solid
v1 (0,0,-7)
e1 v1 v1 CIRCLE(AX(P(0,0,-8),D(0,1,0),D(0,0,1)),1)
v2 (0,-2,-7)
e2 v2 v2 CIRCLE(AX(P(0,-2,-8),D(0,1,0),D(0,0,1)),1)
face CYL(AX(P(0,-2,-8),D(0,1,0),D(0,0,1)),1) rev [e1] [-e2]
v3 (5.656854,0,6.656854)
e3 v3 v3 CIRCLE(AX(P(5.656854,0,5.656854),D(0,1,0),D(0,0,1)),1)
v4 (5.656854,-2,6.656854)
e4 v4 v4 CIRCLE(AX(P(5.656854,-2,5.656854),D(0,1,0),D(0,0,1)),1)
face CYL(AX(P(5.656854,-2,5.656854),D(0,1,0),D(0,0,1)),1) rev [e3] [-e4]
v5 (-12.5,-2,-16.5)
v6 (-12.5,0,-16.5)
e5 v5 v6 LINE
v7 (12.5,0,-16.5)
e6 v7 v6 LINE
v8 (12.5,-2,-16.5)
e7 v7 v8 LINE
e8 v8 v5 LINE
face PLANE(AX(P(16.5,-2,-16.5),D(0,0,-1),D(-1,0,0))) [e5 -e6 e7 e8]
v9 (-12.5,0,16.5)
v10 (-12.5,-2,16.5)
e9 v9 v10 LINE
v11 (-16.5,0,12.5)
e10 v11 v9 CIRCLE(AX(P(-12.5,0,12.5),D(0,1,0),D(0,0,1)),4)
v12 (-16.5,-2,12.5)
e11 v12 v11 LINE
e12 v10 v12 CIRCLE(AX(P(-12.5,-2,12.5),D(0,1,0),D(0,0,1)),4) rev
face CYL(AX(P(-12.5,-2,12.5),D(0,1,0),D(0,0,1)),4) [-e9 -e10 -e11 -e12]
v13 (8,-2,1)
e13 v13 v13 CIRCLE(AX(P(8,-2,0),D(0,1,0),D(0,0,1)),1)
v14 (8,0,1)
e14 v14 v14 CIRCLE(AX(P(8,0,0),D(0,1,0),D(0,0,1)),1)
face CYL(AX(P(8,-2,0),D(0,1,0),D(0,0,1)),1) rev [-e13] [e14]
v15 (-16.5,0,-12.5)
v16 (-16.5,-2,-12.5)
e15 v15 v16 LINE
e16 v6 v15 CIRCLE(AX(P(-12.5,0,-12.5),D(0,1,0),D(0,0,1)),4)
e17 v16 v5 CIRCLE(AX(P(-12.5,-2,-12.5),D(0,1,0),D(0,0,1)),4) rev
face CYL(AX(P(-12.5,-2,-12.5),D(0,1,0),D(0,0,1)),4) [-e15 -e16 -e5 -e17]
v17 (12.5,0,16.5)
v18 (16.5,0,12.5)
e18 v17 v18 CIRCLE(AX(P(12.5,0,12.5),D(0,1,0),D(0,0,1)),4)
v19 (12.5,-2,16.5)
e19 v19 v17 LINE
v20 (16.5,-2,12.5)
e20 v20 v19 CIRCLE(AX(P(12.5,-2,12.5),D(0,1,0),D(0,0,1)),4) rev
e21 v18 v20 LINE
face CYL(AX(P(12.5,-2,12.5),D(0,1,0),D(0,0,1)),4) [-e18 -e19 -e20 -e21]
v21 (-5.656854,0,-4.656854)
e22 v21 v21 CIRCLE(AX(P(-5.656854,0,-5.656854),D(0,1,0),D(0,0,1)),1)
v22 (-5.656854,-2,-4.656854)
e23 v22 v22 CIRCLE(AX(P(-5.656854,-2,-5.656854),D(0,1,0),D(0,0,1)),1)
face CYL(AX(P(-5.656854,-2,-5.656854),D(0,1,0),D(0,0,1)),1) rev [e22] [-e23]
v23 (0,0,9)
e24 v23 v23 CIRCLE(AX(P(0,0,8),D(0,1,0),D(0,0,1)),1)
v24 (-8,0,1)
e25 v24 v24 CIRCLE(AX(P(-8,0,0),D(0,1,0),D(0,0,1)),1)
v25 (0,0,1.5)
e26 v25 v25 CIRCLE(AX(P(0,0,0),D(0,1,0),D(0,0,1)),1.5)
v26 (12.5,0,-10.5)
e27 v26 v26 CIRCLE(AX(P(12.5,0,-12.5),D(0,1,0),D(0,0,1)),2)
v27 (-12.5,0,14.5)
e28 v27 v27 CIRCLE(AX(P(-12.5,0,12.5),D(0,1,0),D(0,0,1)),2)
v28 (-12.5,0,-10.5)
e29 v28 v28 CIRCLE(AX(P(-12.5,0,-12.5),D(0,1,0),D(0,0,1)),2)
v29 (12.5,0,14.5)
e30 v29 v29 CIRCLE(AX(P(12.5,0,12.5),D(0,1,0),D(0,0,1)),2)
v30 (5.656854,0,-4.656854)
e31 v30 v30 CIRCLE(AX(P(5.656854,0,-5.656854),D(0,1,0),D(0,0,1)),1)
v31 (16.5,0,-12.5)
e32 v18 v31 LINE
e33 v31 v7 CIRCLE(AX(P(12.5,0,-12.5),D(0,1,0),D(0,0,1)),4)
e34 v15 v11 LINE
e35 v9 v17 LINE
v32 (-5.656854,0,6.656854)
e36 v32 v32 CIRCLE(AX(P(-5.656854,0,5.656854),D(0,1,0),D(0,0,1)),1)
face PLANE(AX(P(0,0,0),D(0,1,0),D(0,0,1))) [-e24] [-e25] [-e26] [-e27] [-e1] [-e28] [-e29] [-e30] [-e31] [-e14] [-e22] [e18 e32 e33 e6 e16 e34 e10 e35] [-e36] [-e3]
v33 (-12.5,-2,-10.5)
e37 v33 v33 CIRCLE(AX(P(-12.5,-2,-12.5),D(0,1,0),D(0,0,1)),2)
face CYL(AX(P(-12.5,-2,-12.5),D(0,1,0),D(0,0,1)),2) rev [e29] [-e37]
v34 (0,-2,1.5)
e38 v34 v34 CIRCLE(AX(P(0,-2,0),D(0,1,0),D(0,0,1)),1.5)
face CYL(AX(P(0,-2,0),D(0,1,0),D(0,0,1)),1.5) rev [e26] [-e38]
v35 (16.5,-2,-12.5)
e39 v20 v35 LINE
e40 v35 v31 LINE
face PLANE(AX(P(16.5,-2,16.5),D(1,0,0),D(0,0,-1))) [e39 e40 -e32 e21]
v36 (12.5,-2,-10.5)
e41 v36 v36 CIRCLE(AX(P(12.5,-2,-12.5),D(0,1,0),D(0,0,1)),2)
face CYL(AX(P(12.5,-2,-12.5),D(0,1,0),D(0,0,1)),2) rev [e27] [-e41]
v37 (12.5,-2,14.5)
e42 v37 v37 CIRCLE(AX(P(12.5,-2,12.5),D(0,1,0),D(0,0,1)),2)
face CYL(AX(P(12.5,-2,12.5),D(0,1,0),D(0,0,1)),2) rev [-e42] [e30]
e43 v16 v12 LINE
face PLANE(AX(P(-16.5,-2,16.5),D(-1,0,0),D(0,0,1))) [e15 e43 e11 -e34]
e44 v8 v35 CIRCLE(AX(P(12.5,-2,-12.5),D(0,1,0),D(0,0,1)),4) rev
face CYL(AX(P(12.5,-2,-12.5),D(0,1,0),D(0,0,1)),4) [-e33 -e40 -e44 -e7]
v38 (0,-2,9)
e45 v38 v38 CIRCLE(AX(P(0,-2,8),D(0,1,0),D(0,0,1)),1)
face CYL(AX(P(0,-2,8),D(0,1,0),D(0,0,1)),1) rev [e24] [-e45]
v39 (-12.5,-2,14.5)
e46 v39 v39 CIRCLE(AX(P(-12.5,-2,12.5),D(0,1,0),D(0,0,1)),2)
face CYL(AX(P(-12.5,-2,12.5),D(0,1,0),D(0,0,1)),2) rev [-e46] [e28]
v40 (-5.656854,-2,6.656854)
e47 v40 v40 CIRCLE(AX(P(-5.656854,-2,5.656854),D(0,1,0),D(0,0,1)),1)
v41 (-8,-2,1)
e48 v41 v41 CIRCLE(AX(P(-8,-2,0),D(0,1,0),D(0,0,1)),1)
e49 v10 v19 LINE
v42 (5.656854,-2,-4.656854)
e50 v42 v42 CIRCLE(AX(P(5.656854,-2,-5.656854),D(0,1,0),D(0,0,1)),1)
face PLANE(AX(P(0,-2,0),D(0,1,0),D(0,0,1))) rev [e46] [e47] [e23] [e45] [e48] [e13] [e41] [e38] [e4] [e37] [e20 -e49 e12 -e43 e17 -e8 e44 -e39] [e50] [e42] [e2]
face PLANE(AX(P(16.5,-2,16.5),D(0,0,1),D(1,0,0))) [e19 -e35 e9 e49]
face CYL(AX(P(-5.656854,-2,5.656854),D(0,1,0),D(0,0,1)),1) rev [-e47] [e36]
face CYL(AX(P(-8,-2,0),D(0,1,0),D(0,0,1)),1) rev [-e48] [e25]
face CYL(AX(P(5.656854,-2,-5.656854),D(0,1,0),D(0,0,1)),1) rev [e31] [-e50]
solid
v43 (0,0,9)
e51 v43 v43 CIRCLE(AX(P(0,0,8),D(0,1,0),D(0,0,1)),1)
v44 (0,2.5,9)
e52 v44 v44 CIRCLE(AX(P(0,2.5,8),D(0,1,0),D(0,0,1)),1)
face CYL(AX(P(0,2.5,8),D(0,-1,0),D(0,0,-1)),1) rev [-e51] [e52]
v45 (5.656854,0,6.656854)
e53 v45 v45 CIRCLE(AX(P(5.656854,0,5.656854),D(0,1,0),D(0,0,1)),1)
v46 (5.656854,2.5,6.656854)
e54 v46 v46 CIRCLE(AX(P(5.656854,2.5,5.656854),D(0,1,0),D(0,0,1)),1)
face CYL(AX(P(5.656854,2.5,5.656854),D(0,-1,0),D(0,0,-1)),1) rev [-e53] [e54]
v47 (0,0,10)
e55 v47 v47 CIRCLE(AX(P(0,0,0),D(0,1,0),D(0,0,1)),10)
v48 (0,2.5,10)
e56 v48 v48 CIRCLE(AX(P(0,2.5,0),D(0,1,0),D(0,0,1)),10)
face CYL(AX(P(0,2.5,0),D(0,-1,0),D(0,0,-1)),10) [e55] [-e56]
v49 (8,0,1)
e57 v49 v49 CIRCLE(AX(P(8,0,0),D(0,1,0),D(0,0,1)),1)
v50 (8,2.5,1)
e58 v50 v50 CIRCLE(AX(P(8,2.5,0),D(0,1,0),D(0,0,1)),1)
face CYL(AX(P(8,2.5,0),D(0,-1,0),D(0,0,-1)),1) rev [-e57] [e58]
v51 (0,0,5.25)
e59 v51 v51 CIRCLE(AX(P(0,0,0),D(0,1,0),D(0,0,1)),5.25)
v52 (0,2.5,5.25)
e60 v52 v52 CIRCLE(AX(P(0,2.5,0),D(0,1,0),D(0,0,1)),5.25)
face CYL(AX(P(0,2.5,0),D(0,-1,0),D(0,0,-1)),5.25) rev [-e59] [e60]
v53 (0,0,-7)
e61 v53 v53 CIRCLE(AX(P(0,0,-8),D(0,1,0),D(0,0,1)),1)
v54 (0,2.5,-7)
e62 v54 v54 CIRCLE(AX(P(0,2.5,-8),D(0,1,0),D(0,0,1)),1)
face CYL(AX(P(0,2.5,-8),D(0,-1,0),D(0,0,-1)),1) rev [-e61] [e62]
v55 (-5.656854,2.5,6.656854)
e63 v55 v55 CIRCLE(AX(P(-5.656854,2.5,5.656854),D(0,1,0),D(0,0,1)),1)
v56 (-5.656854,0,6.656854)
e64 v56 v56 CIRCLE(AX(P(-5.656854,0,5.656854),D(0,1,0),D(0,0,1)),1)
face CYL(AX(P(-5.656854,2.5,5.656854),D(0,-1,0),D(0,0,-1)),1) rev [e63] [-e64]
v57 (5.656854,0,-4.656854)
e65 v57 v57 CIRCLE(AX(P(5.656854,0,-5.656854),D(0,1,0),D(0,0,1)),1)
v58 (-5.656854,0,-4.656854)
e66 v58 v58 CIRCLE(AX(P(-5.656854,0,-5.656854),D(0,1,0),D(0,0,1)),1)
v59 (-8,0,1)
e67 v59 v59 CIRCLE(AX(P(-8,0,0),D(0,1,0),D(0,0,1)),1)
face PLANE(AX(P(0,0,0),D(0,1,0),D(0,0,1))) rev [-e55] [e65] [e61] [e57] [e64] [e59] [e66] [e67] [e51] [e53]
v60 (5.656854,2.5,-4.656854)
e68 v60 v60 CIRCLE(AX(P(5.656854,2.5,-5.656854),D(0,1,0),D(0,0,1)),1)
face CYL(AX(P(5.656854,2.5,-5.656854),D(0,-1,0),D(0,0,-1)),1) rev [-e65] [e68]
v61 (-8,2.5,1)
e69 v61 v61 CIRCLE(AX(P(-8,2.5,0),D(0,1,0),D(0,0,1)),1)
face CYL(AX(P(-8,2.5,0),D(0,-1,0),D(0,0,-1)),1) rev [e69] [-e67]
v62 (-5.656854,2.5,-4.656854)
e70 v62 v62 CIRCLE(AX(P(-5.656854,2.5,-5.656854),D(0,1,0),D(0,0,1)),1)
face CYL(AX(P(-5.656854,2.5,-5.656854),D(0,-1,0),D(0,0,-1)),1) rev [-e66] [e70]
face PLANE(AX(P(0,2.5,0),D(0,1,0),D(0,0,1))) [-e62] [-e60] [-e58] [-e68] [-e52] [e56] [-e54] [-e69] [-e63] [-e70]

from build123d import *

# Parameters (mm, degrees)
SKETCH_1_W             = 33
SKETCH_1_H             = 33
SM_BASE_FLANGE_1_DEPTH = 2
SKETCH_6_R             = 1
SKETCH_6_R_2           = 2
SKETCH_6_R_3           = 1.5
CUT_EXTRUDE_1_DEPTH    = 24.420076857
FILLET_1_R             = 4
SM_START               = 2.5
SKETCH_7_R             = 10
SKETCH_7_R_2           = 1
SKETCH_7_R_3           = 5.25
SM_BASE_FLANGE_2_DEPTH = 2.5


# Sheet-metal steps are written as plain solids
with BuildPart() as part:
    # Sketch 1 → 基体-法兰1 (new body)
    with BuildSketch(Plane(origin=(0, 0, 0), x_dir=(1, 0, 0), z_dir=(0, 1, 0))):
        Rectangle(SKETCH_1_W, SKETCH_1_H)
    extrude(amount=-SM_BASE_FLANGE_1_DEPTH)

    # 草图6 → 切除-拉伸1 (cut, through all)
    with BuildSketch(Plane(origin=(0, 0, 0), x_dir=(1, 0, 0), z_dir=(0, 1, 0))):
        with Locations(Location((0, 8, 0), (0, 0, 270))):
            Circle(SKETCH_6_R)
        with Locations(Location((5.656854249, 5.656854249, 0), (0, 0, 270))):
            Circle(SKETCH_6_R)
        with Locations(Location((8, 0, 0), (0, 0, 270))):
            Circle(SKETCH_6_R)
        with Locations(Location((5.656854249, -5.656854249, 0), (0, 0, 270))):
            Circle(SKETCH_6_R)
        with Locations(Location((0, -8, 0), (0, 0, 270))):
            Circle(SKETCH_6_R)
        with Locations(Location((-5.656854249, -5.656854249, 0), (0, 0, 270))):
            Circle(SKETCH_6_R)
        with Locations(Location((-8, 0, 0), (0, 0, 270))):
            Circle(SKETCH_6_R)
        with Locations(Location((-5.656854249, 5.656854249, 0), (0, 0, 270))):
            Circle(SKETCH_6_R)
        with Locations(Location((-12.5, 12.5, 0), (0, 0, 270))):
            Circle(SKETCH_6_R_2)
        with Locations(Location((12.5, 12.5, 0), (0, 0, 270))):
            Circle(SKETCH_6_R_2)
        with Locations(Location((12.5, -12.5, 0), (0, 0, 270))):
            Circle(SKETCH_6_R_2)
        with Locations(Location((-12.5, -12.5, 0), (0, 0, 270))):
            Circle(SKETCH_6_R_2)
        with Locations(Location((0, 0, 0), (0, 0, 270))):
            Circle(SKETCH_6_R_3)
    extrude(amount=-CUT_EXTRUDE_1_DEPTH, mode=Mode.SUBTRACT)

    # 圆角1
    fillet_1_edges = [part.edges().sort_by_distance(p)[0] for p in [
        (-16.5, -1, -16.5),
        (16.5, -1, -16.5),
        (16.5, -1, 16.5),
        (-16.5, -1, 16.5),
    ]]
    fillet(fillet_1_edges, radius=FILLET_1_R)


with BuildPart() as body_2:
    # 草图7 → 基体-法兰2 (new body)
    with BuildSketch(Plane(origin=(0, 0, 0), x_dir=(1, 0, 0), z_dir=(0, 1, 0)).offset(SM_START)):
        with Locations(Location((0, 0, 0), (0, 0, 270))):
            Circle(SKETCH_7_R)
        with Locations(Location((5.656854249, 5.656854249, 0), (0, 0, 270))):
            Circle(SKETCH_7_R_2, mode=Mode.SUBTRACT)
        with Locations(Location((8, 0, 0), (0, 0, 270))):
            Circle(SKETCH_7_R_2, mode=Mode.SUBTRACT)
        with Locations(Location((5.656854249, -5.656854249, 0), (0, 0, 270))):
            Circle(SKETCH_7_R_2, mode=Mode.SUBTRACT)
        with Locations(Location((0, -8, 0), (0, 0, 270))):
            Circle(SKETCH_7_R_2, mode=Mode.SUBTRACT)
        with Locations(Location((-5.656854249, -5.656854249, 0), (0, 0, 270))):
            Circle(SKETCH_7_R_2, mode=Mode.SUBTRACT)
        with Locations(Location((-8, 0, 0), (0, 0, 270))):
            Circle(SKETCH_7_R_2, mode=Mode.SUBTRACT)
        with Locations(Location((-5.656854249, 5.656854249, 0), (0, 0, 270))):
            Circle(SKETCH_7_R_2, mode=Mode.SUBTRACT)
        with Locations(Location((0, 8, 0), (0, 0, 270))):
            Circle(SKETCH_7_R_2, mode=Mode.SUBTRACT)
        with Locations(Location((0, 0, 0), (0, 0, 270))):
            Circle(SKETCH_7_R_3, mode=Mode.SUBTRACT)
    extrude(amount=-SM_BASE_FLANGE_2_DEPTH)


solid = Compound([part.part, body_2.part])
